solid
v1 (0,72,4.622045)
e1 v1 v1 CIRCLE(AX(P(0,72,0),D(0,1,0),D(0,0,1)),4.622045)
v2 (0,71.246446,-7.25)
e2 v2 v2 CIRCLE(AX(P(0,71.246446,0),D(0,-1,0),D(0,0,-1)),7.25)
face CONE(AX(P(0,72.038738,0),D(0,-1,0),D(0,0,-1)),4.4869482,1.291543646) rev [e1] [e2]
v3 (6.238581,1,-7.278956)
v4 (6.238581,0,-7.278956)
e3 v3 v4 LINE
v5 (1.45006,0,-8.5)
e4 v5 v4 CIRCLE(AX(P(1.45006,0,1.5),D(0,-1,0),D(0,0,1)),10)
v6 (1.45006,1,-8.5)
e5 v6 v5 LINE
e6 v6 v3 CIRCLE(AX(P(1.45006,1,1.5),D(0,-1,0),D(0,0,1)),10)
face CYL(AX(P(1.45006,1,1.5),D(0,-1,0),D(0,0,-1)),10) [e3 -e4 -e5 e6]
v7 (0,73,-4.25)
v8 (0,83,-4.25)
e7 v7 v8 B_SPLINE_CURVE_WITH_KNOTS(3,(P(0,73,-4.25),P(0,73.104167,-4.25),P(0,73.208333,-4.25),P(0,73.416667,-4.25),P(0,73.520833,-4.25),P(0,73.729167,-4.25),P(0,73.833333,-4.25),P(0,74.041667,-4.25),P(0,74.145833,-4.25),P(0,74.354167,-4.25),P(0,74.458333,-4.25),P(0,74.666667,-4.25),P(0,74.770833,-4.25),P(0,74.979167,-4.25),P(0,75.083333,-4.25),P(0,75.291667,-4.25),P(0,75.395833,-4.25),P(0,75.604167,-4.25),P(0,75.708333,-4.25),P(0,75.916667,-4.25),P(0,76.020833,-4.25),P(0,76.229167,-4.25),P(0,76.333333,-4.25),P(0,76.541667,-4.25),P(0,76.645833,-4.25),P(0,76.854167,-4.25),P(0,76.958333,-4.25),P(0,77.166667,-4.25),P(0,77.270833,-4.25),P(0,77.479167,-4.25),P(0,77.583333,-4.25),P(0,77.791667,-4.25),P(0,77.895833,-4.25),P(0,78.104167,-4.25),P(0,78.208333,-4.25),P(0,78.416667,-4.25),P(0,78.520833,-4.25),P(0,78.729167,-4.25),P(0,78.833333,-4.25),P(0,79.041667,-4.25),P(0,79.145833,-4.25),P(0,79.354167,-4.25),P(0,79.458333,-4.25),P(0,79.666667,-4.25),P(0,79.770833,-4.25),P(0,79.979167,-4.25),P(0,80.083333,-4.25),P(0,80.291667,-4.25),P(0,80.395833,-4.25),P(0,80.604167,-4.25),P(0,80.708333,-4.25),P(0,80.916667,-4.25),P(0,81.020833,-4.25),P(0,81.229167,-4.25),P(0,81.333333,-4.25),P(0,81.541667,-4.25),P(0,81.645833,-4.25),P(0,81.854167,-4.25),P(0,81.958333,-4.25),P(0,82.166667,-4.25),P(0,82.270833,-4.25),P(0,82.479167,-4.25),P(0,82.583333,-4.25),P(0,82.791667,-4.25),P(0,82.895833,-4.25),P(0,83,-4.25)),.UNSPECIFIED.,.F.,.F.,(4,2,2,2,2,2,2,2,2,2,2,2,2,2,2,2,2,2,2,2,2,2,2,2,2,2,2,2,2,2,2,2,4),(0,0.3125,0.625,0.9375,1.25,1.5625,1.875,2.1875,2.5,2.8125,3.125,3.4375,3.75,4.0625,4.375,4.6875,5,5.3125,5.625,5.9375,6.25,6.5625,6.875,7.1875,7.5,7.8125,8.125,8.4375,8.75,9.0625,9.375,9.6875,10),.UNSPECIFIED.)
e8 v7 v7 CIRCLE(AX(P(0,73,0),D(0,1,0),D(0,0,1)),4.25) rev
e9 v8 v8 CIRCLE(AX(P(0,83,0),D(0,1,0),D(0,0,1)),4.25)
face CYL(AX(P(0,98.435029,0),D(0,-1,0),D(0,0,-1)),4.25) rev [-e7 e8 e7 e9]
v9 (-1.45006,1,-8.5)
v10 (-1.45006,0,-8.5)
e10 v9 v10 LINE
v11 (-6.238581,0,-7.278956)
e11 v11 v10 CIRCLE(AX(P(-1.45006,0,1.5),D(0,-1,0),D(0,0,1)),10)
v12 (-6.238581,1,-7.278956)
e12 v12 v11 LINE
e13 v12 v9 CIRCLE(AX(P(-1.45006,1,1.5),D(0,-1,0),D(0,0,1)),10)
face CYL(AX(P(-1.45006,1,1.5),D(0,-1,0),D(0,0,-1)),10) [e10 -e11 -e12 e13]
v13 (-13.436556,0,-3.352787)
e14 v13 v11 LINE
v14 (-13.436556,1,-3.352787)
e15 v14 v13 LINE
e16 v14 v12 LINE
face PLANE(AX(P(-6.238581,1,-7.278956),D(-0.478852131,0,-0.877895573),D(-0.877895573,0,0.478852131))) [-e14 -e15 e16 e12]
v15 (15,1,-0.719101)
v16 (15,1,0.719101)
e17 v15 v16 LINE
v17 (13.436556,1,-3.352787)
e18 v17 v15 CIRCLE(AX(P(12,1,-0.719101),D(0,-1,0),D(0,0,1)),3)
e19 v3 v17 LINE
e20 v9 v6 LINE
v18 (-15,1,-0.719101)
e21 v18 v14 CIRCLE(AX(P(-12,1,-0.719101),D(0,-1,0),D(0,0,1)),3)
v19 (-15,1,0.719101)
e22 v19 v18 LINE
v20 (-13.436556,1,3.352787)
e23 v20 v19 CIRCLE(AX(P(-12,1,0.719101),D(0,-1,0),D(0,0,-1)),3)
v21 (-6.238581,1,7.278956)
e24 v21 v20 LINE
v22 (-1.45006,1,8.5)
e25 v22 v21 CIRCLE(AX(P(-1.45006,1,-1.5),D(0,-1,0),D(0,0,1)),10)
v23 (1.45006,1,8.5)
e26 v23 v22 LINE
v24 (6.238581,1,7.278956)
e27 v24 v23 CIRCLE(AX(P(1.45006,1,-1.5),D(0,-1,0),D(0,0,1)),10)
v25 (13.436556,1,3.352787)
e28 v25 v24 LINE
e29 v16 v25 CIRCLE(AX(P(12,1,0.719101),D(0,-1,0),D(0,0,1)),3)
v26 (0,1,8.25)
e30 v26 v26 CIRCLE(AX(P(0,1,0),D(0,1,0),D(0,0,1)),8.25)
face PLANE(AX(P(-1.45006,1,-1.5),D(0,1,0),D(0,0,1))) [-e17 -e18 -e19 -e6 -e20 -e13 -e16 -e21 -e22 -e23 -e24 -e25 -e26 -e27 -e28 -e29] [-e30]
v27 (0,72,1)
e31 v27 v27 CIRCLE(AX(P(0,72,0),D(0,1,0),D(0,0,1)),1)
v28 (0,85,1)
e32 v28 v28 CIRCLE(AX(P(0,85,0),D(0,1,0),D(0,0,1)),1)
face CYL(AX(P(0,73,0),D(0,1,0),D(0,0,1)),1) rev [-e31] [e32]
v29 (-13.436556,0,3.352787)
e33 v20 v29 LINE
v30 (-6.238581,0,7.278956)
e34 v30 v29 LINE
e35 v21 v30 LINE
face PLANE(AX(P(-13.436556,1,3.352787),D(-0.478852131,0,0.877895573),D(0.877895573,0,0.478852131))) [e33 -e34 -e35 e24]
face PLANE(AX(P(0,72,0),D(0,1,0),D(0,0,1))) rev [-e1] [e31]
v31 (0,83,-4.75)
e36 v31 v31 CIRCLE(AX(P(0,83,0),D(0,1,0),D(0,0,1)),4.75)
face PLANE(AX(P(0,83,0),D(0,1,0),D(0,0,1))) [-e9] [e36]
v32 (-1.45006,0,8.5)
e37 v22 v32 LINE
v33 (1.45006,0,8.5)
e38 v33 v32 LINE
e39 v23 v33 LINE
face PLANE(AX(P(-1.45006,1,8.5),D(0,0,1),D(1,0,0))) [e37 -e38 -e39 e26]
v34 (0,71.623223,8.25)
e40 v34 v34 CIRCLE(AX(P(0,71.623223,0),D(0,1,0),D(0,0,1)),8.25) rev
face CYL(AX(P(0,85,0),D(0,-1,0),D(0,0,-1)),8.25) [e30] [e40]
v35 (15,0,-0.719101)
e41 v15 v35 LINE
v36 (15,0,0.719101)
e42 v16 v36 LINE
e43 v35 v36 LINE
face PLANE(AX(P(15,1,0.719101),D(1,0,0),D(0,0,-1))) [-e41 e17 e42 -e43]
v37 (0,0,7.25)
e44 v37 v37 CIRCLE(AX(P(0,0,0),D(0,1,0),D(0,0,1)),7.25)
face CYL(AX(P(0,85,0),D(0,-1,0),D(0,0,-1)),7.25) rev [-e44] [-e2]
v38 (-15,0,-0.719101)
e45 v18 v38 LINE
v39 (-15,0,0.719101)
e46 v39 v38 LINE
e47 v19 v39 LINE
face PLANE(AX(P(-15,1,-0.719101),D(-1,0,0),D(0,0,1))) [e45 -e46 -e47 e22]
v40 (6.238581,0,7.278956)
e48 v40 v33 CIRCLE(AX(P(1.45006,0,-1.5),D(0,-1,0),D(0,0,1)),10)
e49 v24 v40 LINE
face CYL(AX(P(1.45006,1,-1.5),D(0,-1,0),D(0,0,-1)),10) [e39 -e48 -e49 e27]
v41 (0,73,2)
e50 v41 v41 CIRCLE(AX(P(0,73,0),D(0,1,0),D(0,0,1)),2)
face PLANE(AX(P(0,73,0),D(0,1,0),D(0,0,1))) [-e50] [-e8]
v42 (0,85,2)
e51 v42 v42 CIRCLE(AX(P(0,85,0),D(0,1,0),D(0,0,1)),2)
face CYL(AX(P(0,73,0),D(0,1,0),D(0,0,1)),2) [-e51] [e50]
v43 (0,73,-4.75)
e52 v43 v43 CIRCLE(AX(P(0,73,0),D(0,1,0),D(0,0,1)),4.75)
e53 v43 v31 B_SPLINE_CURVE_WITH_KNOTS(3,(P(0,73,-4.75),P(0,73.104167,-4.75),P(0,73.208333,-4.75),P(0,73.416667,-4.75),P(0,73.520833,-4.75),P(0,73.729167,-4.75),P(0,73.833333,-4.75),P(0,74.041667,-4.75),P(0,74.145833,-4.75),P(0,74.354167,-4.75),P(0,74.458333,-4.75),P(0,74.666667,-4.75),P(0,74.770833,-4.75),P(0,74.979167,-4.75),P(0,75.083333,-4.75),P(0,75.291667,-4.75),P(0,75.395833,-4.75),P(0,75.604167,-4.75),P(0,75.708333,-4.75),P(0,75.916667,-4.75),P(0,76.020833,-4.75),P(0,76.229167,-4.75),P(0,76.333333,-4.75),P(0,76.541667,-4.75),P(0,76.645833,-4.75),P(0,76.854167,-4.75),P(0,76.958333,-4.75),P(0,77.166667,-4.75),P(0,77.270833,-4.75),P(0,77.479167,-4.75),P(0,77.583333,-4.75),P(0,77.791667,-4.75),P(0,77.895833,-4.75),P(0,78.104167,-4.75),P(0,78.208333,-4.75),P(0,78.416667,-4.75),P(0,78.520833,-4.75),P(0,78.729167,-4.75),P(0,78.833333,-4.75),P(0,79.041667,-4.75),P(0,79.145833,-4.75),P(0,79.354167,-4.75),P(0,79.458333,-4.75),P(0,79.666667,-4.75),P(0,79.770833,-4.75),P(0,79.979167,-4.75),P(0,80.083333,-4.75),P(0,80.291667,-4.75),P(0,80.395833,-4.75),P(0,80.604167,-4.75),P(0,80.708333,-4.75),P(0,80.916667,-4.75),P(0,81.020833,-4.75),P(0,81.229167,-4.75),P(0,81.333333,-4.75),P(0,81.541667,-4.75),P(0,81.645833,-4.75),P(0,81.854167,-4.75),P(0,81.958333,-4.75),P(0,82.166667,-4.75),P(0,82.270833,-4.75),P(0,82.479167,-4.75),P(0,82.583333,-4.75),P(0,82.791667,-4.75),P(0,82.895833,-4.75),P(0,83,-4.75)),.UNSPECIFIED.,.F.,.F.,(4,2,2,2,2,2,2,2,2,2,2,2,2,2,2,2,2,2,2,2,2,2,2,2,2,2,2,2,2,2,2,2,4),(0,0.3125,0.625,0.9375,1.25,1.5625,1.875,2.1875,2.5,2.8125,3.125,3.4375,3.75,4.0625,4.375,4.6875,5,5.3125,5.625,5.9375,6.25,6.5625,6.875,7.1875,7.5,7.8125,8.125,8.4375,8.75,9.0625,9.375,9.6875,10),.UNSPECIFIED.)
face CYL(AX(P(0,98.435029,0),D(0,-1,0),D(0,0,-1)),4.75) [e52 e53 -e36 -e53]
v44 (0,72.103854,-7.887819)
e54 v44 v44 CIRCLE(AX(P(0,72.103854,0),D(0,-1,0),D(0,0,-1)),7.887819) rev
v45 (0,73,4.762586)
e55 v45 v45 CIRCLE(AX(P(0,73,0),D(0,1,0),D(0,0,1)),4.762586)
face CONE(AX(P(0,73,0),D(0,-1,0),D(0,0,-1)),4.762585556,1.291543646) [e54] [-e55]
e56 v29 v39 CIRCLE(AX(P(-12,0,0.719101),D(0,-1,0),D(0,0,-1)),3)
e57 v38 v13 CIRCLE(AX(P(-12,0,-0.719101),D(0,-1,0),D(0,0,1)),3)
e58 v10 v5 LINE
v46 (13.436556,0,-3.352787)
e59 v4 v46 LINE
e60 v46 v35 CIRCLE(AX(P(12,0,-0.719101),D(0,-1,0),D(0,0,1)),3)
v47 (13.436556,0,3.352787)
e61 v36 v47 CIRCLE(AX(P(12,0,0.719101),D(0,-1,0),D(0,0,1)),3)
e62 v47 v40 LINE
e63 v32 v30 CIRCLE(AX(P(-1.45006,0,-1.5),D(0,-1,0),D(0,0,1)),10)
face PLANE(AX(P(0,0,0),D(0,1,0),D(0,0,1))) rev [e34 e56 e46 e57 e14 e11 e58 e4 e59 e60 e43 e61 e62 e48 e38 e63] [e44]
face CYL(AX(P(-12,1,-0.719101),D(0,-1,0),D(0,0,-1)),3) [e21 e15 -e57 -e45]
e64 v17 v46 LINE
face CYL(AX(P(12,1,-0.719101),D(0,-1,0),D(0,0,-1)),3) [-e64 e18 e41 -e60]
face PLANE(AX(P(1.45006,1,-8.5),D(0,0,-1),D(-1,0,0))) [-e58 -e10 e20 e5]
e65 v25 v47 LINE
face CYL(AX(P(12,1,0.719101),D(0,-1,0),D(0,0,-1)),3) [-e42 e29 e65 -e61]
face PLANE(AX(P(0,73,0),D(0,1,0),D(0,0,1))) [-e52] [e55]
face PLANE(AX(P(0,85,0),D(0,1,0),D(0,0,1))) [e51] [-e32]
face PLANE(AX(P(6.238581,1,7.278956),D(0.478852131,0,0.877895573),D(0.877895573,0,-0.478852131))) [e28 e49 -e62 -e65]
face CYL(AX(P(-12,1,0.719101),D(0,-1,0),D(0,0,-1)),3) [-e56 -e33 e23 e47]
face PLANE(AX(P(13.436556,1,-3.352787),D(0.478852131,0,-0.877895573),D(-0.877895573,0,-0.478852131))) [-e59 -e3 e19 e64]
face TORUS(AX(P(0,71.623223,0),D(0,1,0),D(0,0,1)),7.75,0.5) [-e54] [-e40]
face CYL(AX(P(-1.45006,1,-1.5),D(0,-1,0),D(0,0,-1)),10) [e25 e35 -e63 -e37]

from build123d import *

# Parameters (mm, degrees)
SKETCH1_R           = 8.25
BOSS_EXTRUDE1_DEPTH = 85
SKETCH2_OUTSIDE_W   = 36.128
SKETCH2_OUTSIDE_H   = 36.128
SKETCH2_OUTSIDE_R   = 2
CUT_EXTRUDE1_DEPTH  = 12
SKETCH3_R           = 4.75
SKETCH3_R_2         = 4.25
BOSS_EXTRUDE2_DEPTH = 10
CHAMFER1_SIZE       = 1
CHAMFER1_SIZE2      = 3.487414444
FILLET1_R           = 0.5
BOSS_EXTRUDE3_START = -1
SKETCH4_R           = 7.25
BOSS_EXTRUDE3_DEPTH = 1


# Read off the part's stored shape, not the designer's step: Shell1
with BuildPart() as part:
    # Sketch1 → Boss-Extrude1 (new body)
    with BuildSketch(Plane(origin=(0, 0, 0), x_dir=(1, 0, 0), z_dir=(0, 1, 0))):
        with Locations(Location((0, 0, 0), (0, 0, 270))):
            Circle(SKETCH1_R)
    extrude(amount=BOSS_EXTRUDE1_DEPTH)

    # Sketch2 outside → Cut-Extrude1 (cut)
    with BuildSketch(Plane(origin=(0, 85, 0), x_dir=(1, 0, 0), z_dir=(0, 1, 0))):
        Rectangle(SKETCH2_OUTSIDE_W, SKETCH2_OUTSIDE_H)
        with Locations(Location((0, 0, 0), (0, 0, 270))):
            Circle(SKETCH2_OUTSIDE_R, mode=Mode.SUBTRACT)
    extrude(amount=-CUT_EXTRUDE1_DEPTH, mode=Mode.SUBTRACT)

    # Sketch3 → Boss-Extrude2 (add)
    with BuildSketch(Plane(origin=(0, 73, 0), x_dir=(1, 0, 0), z_dir=(0, 1, 0))):
        with Locations(Location((0, 0, 0), (0, 0, 90))):
            Circle(SKETCH3_R)
        with Locations(Location((0, 0, 0), (0, 0, 90))):
            Circle(SKETCH3_R_2, mode=Mode.SUBTRACT)
    extrude(amount=BOSS_EXTRUDE2_DEPTH)

    # Chamfer1
    chamfer1_edges = [part.edges().sort_by_distance(p)[0] for p in [
        (0, 73, -8.25),
    ]]
    chamfer1_side = [part.faces().sort_by_distance(p)[0] for p in [
        (0, 36.5, -8.25),
    ]]
    chamfer(chamfer1_edges, length=CHAMFER1_SIZE, length2=CHAMFER1_SIZE2, reference=chamfer1_side[0])

    # Fillet1
    fillet1_edges = [part.edges().sort_by_distance(p)[0] for p in [
        (0, 72, -8.25),
    ]]
    fillet(fillet1_edges, radius=FILLET1_R)

    # Shell1 outline → Shell1 (revolve, cut)
    with BuildSketch(Plane.XY):
        Polygon((7.25, 0), (7.25, 71.24644595), (4.622044721, 72), (1, 72), (1, 85), (0, 85), (0, 0), align=None)
    revolve(axis=Axis((0, 0, 0), (0, 1, 0)), mode=Mode.SUBTRACT)

    # Sketch4 → Boss-Extrude3 (add)
    with BuildSketch(Plane.XZ.offset(BOSS_EXTRUDE3_START)):
        with BuildLine():
            Line((-13.436556392, 3.352787423), (-6.238581163, 7.278955729))
            ThreePointArc((-6.238581163, 7.278955729), (-3.92093447, 8.189931818), (-1.450059856, 8.5))
            Line((-1.450059856, 8.5), (1.450059856, 8.5))
            ThreePointArc((1.450059856, 8.5), (3.92093447, 8.189931818), (6.238581163, 7.278955729))
            Line((6.238581163, 7.278955729), (13.436556392, 3.352787423))
            ThreePointArc((13.436556392, 3.352787423), (14.579696608, 2.250493995), (15, 0.719100704))
            Line((15, 0.719100704), (15, -0.719100704))
            ThreePointArc((15, -0.719100704), (14.579696608, -2.250493995), (13.436556392, -3.352787423))
            Line((13.436556392, -3.352787423), (6.238581163, -7.278955729))
            ThreePointArc((6.238581163, -7.278955729), (3.92093447, -8.189931818), (1.450059856, -8.5))
            Line((1.450059856, -8.5), (-1.450059856, -8.5))
            ThreePointArc((-1.450059856, -8.5), (-3.92093447, -8.189931818), (-6.238581163, -7.278955729))
            Line((-6.238581163, -7.278955729), (-13.436556392, -3.352787423))
            ThreePointArc((-13.436556392, -3.352787423), (-14.579696608, -2.250493995), (-15, -0.719100704))
            Line((-15, -0.719100704), (-15, 0.719100704))
            ThreePointArc((-15, 0.719100704), (-14.579696608, 2.250493995), (-13.436556392, 3.352787423))
        make_face()
        with Locations(Location((0, 0, 0), (0, 0, 270))):
            Circle(SKETCH4_R, mode=Mode.SUBTRACT)
    extrude(amount=BOSS_EXTRUDE3_DEPTH)


solid = part.part
